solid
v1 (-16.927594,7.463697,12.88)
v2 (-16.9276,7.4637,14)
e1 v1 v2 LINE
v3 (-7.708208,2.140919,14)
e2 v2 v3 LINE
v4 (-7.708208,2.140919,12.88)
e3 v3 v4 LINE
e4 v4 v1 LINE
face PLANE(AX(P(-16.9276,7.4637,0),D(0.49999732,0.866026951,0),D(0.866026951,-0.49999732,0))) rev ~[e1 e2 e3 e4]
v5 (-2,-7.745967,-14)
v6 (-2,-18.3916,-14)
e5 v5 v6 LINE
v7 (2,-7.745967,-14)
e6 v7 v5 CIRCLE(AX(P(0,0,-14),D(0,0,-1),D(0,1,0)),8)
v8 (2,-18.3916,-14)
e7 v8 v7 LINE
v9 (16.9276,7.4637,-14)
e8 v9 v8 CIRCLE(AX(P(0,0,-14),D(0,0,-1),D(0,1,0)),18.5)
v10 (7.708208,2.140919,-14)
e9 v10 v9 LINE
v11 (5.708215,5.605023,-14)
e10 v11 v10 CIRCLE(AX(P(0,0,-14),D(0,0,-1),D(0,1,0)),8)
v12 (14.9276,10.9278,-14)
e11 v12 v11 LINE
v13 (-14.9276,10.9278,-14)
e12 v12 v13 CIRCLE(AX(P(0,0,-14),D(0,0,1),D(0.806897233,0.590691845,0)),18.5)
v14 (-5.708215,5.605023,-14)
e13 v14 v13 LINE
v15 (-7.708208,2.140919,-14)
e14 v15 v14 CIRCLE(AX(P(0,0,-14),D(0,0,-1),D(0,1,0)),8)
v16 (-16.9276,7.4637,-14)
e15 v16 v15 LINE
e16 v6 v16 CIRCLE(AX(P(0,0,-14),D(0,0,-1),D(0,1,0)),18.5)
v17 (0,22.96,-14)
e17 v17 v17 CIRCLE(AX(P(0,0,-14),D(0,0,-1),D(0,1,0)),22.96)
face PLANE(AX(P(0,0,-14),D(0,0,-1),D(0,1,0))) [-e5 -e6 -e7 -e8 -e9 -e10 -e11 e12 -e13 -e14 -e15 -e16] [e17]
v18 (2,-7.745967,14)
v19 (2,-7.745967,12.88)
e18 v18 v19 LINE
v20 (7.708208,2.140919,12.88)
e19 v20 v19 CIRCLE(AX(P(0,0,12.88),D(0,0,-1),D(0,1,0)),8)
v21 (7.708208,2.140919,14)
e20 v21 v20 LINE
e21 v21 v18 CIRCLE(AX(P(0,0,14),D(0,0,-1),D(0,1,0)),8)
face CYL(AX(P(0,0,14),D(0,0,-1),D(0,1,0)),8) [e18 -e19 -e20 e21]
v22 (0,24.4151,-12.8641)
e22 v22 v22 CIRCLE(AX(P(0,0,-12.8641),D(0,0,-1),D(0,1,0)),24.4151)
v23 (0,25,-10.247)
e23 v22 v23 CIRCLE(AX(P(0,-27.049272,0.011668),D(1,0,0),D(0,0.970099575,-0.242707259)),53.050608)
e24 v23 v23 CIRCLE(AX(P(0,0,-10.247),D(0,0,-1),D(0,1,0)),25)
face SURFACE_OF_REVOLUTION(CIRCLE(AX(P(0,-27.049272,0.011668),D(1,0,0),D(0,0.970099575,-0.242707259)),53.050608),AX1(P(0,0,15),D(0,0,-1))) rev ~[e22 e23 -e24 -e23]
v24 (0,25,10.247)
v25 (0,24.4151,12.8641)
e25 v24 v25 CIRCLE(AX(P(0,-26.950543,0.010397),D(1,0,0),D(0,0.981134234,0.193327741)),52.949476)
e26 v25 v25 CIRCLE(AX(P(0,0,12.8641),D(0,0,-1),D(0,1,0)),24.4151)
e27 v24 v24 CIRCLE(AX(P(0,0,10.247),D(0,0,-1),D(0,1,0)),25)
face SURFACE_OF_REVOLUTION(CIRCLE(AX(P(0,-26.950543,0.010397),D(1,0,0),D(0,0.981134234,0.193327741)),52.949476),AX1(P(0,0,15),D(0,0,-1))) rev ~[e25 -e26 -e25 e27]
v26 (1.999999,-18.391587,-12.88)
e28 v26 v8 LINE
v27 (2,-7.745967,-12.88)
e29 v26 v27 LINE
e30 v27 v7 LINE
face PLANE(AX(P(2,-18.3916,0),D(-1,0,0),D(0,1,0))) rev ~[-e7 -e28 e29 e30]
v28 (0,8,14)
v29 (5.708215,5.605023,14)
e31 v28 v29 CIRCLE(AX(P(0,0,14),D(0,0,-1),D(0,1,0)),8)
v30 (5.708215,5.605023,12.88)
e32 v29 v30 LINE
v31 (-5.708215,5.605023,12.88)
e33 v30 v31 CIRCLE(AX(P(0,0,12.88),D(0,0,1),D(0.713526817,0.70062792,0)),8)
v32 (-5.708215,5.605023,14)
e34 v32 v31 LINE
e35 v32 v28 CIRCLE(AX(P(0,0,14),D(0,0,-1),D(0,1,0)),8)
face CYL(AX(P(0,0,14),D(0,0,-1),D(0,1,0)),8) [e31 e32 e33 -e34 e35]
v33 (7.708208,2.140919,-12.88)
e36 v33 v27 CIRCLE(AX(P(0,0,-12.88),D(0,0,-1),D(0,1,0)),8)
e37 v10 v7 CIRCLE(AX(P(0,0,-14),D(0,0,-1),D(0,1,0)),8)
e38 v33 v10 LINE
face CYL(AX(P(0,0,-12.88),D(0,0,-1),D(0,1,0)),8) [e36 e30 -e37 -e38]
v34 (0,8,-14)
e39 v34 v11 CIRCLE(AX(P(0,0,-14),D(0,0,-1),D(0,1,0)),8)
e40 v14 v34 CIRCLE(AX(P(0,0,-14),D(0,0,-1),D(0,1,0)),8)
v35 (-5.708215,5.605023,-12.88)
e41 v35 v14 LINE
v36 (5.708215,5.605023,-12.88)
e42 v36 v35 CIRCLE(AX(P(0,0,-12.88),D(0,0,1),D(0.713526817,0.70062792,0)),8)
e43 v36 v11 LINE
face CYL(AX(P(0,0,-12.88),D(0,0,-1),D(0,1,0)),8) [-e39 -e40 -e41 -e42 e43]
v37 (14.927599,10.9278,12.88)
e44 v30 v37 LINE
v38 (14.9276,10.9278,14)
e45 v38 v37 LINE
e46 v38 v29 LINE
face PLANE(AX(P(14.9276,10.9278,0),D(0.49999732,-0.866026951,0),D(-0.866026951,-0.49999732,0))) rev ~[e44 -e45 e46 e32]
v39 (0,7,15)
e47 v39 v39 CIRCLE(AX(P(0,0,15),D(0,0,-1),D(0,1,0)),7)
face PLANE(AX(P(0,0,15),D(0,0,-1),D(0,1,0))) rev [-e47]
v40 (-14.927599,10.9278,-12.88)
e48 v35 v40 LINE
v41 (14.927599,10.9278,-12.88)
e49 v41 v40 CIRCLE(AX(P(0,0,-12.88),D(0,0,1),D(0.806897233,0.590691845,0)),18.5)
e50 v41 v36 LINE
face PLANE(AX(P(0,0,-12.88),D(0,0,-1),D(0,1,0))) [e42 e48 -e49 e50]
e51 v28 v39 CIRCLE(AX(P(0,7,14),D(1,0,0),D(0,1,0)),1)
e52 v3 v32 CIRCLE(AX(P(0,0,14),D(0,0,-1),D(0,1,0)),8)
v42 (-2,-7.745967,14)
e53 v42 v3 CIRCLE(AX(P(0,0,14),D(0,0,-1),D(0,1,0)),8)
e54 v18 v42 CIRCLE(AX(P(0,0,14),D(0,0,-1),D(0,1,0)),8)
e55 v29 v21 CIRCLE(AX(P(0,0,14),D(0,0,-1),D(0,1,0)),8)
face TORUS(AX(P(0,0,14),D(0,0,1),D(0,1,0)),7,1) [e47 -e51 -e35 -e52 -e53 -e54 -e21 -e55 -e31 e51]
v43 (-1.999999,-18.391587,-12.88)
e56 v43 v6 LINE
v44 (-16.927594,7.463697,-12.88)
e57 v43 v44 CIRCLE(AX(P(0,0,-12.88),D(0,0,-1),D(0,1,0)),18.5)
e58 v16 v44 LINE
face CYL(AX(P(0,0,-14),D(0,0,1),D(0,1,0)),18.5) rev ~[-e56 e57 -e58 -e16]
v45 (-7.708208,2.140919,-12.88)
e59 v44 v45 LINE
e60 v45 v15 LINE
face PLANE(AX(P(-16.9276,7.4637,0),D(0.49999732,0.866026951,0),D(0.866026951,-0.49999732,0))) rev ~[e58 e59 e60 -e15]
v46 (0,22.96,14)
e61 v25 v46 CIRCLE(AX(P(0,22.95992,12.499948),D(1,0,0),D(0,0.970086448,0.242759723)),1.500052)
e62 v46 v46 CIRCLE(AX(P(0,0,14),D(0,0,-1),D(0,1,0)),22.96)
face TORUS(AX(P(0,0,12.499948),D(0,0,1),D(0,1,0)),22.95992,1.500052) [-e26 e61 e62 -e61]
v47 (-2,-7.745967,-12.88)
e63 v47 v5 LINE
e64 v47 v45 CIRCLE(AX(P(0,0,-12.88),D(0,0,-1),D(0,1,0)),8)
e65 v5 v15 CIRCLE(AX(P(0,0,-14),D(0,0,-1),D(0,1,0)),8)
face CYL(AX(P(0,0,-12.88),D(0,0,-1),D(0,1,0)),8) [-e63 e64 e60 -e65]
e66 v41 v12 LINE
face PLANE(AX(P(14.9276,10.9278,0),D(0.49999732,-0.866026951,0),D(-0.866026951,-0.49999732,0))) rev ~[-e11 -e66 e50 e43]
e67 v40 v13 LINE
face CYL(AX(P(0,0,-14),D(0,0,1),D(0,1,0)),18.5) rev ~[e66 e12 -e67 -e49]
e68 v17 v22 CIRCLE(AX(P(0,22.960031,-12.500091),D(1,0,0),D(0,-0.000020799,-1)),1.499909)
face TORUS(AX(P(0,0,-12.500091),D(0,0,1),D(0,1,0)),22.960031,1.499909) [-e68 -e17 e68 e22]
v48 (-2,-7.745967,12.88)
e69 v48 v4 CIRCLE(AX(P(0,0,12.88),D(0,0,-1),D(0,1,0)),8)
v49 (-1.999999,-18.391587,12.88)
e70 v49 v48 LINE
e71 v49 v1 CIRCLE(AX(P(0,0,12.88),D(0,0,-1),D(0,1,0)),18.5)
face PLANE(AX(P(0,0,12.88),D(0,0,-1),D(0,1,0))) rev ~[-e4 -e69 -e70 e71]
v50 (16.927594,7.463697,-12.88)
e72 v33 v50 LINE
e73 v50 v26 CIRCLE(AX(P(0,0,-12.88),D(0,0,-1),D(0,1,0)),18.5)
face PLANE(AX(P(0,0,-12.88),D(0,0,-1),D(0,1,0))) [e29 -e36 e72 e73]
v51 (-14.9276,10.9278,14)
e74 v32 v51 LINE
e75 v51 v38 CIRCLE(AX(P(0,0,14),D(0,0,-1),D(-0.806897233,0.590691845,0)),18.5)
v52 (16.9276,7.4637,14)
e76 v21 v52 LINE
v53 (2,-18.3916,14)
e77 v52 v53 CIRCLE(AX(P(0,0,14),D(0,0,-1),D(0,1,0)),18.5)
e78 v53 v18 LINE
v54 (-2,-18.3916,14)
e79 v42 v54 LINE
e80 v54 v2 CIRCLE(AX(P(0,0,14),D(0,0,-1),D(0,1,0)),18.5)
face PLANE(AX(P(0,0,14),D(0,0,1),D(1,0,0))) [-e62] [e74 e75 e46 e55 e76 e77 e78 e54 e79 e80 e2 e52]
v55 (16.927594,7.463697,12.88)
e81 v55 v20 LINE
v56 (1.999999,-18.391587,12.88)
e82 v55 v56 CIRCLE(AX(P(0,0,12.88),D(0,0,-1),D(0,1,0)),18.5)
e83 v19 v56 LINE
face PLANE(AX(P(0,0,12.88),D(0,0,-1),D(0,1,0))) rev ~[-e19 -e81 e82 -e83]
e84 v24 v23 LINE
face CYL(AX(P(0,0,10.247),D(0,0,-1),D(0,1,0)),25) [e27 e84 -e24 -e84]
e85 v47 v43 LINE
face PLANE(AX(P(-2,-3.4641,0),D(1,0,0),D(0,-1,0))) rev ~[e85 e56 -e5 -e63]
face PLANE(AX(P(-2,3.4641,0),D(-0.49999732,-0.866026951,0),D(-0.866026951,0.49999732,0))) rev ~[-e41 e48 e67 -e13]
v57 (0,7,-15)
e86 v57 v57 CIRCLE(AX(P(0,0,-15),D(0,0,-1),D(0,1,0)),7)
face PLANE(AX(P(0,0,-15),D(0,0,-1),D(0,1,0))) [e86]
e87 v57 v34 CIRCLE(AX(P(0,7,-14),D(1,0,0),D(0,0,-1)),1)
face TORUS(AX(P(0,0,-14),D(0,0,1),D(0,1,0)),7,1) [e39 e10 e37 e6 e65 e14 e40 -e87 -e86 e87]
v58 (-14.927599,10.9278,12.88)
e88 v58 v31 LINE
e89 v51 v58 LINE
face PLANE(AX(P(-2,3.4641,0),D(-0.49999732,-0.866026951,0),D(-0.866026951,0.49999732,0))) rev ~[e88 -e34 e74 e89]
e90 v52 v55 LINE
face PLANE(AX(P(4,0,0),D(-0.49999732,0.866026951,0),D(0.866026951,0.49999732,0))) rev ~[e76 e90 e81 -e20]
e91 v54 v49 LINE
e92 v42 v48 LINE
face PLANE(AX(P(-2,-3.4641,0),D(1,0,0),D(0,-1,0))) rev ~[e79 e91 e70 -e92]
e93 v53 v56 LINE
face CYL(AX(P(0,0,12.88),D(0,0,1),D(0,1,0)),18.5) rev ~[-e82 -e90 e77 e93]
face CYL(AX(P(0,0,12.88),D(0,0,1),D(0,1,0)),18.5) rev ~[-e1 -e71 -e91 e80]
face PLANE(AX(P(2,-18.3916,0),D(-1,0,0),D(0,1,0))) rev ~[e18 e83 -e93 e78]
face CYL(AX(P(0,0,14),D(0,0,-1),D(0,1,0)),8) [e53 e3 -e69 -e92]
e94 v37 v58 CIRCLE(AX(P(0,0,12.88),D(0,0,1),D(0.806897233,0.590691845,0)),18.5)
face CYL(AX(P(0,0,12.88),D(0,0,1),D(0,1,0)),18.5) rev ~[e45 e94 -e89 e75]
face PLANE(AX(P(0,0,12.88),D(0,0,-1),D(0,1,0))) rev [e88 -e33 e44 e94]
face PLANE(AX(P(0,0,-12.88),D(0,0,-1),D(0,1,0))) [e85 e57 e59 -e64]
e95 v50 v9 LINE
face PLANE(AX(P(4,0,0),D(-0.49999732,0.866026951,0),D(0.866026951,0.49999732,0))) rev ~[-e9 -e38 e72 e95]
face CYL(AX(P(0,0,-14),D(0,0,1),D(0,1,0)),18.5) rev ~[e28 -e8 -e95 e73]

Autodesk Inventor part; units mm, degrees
sketch "Sketch_1" plane through (0, 0, 0) normal (1, 0, 0) x (0, 1, 0)
  line L0 (0, -14) -> (0, 14)
  line L1 (0, 15) -> (7, 15)
  arc A0 (8, 14) -> (7, 15) centre (7, 14) ccw
  line L2 (8, 14) -> (8, 12.88)
  line L3 (8, 12.88) -> (18.5, 12.88)
  line L4 (18.5, 12.88) -> (18.5, 14)
  line L5 (18.5, 14) -> (22.96, 14)
  arc A1 (24.4151, 12.8641) -> (22.96, 14) centre (22.96, 12.5) ccw
  arc A2 (25, 10.247) -> (24.4151, 12.8641) centre (-27, 0) ccw
  line L6 (25, 10.247) -> (25, -10.247)
  arc A3 (24.4151, -12.8641) -> (25, -10.247) centre (-27, 0) ccw
  arc A4 (22.96, -14) -> (24.4151, -12.8641) centre (22.96, -12.5) ccw
  line L7 (22.96, -14) -> (18.5, -14)
  line L8 (18.5, -14) -> (18.5, -12.88)
  line L9 (18.5, -12.88) -> (8, -12.88)
  line L10 (8, -12.88) -> (8, -14)
  arc A5 (7, -15) -> (8, -14) centre (7, -14) ccw
  line L11 (7, -15) -> (0, -15)
  line L12 (0, -15) -> (0, 15)
revolve "Revolution1" add sketch "Sketch_1" angle 360 about axis through (0, 0, -14) along (0, 0, -1)
sketch "Sketch_5" plane through (0, 0, 0) normal (0, 0, 1) x (1, 0, 0)
  line L0 (-16.9276, 7.4637) -> (-4, 0)
  arc A0 (-4, 0) -> (-2, -3.4641) centre (0, 0) ccw
  line L1 (-2, -3.4641) -> (-2, -18.3916)
  arc A1 (-2, -18.3916) -> (2, -18.3916) centre (0, 0) ccw
  line L2 (2, -18.3916) -> (2, -3.4641)
  arc A2 (2, -3.4641) -> (4, 0) centre (0, 0) ccw
  line L3 (4, 0) -> (16.9276, 7.4637)
  arc A3 (16.9276, 7.4637) -> (14.9276, 10.9278) centre (0, 0) ccw
  line L4 (14.9276, 10.9278) -> (2, 3.4641)
  arc A4 (2, 3.4641) -> (-2, 3.4641) centre (0, 0) ccw
  line L5 (-2, 3.4641) -> (-14.9276, 10.9278)
  arc A5 (-14.9276, 10.9278) -> (-16.9276, 7.4637) centre (0, 0) ccw
extrude "Extrusion1" add sketch "Sketch_5" along normal mid plane 28
ref_plane "wheel_to_body_XY" through (0, 0, 0) normal (0, 0, 1) x (1, 0, 0)
ref_plane "wheel_to_body_YZ" through (0, 0, 0) normal (1, 0, 0) x (0, 1, 0)
ref_plane "wheel_to_body_ZX" through (0, 0, 0) normal (0, 1, 0) x (0, 0, 1)
properties part number "WHEEL-HSMCS50-N"
